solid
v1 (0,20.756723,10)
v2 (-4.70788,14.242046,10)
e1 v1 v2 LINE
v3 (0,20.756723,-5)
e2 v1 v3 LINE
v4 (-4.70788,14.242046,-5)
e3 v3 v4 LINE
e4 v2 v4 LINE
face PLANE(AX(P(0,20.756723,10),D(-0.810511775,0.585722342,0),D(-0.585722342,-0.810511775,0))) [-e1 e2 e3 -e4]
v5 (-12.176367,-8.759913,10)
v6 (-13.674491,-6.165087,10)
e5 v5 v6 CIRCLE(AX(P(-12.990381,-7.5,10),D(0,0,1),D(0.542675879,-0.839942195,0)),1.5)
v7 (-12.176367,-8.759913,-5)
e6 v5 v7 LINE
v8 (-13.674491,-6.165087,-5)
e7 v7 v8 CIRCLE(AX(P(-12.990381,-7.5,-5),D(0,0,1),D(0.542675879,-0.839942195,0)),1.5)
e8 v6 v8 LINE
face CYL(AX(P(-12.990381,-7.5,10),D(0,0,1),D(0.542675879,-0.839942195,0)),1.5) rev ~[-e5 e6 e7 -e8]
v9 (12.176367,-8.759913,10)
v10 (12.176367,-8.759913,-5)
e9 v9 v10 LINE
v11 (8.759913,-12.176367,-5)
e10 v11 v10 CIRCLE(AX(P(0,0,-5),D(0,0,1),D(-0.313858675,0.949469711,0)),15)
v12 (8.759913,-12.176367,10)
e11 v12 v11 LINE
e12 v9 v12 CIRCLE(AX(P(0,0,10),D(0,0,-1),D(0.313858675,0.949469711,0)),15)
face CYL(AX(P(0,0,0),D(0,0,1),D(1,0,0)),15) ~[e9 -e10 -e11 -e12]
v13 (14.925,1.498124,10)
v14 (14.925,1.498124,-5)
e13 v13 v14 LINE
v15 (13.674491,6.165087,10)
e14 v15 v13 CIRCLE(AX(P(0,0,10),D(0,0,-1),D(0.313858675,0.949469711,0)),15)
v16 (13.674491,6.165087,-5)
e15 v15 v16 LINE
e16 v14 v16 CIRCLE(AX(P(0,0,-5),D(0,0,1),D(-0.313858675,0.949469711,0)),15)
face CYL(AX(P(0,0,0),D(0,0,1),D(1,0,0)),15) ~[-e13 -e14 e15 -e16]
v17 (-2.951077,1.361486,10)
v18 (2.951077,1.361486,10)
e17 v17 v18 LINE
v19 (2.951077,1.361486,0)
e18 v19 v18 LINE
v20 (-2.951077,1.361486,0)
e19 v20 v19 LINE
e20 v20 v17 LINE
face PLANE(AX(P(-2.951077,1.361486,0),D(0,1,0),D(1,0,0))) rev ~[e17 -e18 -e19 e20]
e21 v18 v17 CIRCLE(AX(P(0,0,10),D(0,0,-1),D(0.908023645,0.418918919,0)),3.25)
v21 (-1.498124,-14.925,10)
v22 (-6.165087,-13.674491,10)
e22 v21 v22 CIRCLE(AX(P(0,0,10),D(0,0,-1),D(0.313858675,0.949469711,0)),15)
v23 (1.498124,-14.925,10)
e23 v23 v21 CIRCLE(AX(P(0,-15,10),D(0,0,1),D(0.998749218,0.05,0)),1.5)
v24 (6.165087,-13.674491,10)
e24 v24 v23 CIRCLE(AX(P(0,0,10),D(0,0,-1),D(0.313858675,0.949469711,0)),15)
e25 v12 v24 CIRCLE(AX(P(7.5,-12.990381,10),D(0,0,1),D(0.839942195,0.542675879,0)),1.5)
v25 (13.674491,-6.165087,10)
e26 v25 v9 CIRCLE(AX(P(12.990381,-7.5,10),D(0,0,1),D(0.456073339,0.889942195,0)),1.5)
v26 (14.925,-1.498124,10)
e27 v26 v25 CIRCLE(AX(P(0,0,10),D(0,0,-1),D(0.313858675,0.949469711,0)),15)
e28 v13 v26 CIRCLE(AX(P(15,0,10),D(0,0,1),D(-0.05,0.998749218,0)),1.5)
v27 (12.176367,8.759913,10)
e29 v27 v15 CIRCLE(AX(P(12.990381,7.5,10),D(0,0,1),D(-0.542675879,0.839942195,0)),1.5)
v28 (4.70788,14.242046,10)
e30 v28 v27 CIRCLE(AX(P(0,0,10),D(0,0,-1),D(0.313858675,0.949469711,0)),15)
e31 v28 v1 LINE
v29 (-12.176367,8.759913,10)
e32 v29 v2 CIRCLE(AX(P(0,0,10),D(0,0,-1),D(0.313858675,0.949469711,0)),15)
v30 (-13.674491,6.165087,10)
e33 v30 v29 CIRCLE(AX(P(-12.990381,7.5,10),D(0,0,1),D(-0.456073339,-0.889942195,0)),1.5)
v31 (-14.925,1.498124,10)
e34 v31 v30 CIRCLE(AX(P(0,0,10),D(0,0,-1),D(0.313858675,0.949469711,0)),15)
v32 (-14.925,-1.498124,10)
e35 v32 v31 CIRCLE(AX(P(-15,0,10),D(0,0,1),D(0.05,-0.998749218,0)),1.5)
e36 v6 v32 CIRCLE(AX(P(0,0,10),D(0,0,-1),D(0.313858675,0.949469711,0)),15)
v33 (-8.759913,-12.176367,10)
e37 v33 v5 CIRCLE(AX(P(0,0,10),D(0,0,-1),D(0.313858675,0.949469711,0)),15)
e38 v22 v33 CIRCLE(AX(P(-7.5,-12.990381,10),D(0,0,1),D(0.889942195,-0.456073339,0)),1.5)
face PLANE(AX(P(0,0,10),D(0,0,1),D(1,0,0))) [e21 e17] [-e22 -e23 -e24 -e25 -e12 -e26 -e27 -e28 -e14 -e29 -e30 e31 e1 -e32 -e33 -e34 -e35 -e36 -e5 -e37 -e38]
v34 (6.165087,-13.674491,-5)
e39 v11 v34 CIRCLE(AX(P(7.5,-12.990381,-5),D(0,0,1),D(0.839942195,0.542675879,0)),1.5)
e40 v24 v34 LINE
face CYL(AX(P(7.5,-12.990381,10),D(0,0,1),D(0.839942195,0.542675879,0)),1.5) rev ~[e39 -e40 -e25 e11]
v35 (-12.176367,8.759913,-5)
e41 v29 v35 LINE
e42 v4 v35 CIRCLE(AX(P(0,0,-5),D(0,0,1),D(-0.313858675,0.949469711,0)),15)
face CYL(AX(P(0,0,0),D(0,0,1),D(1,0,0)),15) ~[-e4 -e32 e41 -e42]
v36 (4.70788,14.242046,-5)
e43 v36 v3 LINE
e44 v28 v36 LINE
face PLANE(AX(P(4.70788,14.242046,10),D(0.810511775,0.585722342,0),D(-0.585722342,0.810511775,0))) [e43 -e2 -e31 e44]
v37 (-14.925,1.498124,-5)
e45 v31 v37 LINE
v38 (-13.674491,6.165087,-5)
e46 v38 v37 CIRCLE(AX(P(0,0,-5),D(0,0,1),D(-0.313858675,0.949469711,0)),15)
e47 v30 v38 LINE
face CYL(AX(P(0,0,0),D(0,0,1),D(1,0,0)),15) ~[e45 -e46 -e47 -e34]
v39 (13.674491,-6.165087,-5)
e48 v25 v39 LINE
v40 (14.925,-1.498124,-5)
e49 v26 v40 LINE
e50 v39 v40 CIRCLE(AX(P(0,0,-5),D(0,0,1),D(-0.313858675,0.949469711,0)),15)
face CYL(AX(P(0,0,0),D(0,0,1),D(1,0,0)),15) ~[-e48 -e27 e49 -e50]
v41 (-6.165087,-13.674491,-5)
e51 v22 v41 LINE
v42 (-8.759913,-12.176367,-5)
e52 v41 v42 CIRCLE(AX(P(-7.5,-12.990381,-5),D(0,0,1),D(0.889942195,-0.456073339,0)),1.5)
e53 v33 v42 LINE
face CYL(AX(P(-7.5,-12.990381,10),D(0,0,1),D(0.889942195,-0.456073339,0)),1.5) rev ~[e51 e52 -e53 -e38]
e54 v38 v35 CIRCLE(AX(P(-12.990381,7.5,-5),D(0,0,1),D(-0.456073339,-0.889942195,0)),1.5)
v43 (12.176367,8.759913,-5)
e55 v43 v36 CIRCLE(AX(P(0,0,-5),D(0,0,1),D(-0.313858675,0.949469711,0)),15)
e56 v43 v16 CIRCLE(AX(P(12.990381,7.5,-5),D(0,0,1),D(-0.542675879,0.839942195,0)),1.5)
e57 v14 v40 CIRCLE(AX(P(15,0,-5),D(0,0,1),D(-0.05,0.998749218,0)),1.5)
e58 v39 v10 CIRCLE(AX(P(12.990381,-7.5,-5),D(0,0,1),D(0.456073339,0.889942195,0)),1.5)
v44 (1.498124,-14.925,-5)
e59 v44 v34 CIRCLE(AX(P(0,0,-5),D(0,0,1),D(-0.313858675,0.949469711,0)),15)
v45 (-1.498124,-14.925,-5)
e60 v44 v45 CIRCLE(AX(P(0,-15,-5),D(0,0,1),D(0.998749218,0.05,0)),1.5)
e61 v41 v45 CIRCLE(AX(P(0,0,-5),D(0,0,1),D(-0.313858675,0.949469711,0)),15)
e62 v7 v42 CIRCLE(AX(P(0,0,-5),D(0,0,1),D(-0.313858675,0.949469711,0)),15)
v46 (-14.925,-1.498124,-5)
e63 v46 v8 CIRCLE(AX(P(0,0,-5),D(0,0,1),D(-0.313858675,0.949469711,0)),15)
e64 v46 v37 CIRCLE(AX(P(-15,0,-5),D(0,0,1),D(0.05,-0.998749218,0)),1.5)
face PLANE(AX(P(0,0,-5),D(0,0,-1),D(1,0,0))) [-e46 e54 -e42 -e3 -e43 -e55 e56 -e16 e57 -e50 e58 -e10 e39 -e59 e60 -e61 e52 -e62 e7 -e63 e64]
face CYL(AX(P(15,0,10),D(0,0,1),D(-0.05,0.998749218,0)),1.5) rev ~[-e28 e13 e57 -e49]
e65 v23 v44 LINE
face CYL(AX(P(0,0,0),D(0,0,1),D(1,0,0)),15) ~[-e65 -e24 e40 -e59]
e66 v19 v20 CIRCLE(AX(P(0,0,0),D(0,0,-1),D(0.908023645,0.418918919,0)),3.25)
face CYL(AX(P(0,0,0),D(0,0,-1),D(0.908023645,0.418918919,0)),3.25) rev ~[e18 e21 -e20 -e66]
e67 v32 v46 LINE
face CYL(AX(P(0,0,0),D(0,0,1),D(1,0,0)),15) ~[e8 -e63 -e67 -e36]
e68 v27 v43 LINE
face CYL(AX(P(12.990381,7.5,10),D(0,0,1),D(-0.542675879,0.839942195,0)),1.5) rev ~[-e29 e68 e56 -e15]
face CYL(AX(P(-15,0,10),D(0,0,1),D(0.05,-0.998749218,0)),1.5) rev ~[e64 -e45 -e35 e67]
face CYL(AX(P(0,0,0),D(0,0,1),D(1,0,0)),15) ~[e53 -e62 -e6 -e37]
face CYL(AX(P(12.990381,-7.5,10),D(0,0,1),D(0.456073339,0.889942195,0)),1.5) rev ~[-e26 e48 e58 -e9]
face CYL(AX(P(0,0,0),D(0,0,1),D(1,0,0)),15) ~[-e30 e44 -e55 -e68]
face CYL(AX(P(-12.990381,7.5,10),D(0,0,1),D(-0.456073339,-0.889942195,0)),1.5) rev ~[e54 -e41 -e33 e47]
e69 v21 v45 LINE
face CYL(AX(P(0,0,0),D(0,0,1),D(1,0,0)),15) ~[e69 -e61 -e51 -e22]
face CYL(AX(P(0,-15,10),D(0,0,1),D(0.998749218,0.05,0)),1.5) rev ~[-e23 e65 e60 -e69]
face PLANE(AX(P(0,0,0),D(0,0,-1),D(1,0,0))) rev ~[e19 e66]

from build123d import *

# Parameters (mm, degrees)
F0_R     = 15
F1_DEPTH = 10
F2_R     = 15
F3_DEPTH = 5
F5_DEPTH = 15
F6_DEPTH = 15


# Not quite as in the source:
# - a feature names something its author has since deleted; it is built from what else it names


with BuildPart() as f1:
    # F0 (on Top) → F1 (new body)
    with BuildSketch(Plane.XY):
        Circle(F0_R)
        with BuildLine():
            ThreePointArc((2.9510768453, 1.3614864865), (0, -3.25), (-2.9510768453, 1.3614864865))
            Line((-2.9510768453, 1.3614864865), (2.9510768453, 1.3614864865))
        make_face(mode=Mode.SUBTRACT)
    extrude(amount=F1_DEPTH)

    # F2 (on face) → F3 (join)
    with BuildSketch(Plane(origin=(0, 0, 0), x_dir=(1, 0, 0), z_dir=(0, 0, -1))):
        Circle(F2_R)
        with BuildLine():
            ThreePointArc((-2.9510768453, -1.3614864865), (0, 3.25), (2.9510768453, -1.3614864865))
            Line((2.9510768453, -1.3614864865), (-2.9510768453, -1.3614864865))
        make_face(mode=Mode.SUBTRACT)
        with BuildLine():
            Line((-2.9510768453, -1.3614864865), (2.9510768453, -1.3614864865))
            ThreePointArc((2.9510768453, -1.3614864865), (0, 3.25), (-2.9510768453, -1.3614864865))
        make_face()
    extrude(amount=F3_DEPTH)

    # F4 (on face) → F5 (join)
    with BuildSketch(Plane.XY.offset(10)):
        with BuildLine():
            Line((4.707880128, 14.2420456642), (0, 20.7567233592))
            Line((0, 20.7567233592), (-4.707880128, 14.2420456642))
            ThreePointArc((-4.707880128, 14.2420456642), (0, 15), (4.707880128, 14.2420456642))
        make_face()
    extrude(amount=-F5_DEPTH)

    # F4 (on face) → F6 (cut, through all)
    with BuildSketch(Plane.XY.offset(10)):
        with BuildLine():
            ThreePointArc((13.6744910648, 6.1650867081), (12.9903810568, 7.5), (12.1763672382, 8.7599132919))
            ThreePointArc((12.1763672382, 8.7599132919), (11.6913429511, 6.75), (13.6744910648, 6.1650867081))
        make_face()
        with BuildLine():
            ThreePointArc((15, 0), (14.9812382666, 0.75), (14.925, 1.4981238267))
            ThreePointArc((14.925, 1.4981238267), (13.5, 0), (14.925, -1.4981238267))
            ThreePointArc((14.925, -1.4981238267), (14.9812382666, -0.75), (15, 0))
        make_face()
        with BuildLine():
            ThreePointArc((12.1763672382, -8.7599132919), (12.9903810568, -7.5), (13.6744910648, -6.1650867081))
            ThreePointArc((13.6744910648, -6.1650867081), (11.6913429511, -6.75), (12.1763672382, -8.7599132919))
        make_face()
        with BuildLine():
            ThreePointArc((6.1650867081, -13.6744910648), (7.5, -12.9903810568), (8.7599132919, -12.1763672382))
            ThreePointArc((8.7599132919, -12.1763672382), (6.75, -11.6913429511), (6.1650867081, -13.6744910648))
        make_face()
        with BuildLine():
            ThreePointArc((1.4981238267, -14.925), (0, -13.5), (-1.4981238267, -14.925))
            ThreePointArc((-1.4981238267, -14.925), (0, -15), (1.4981238267, -14.925))
        make_face()
        with BuildLine():
            ThreePointArc((-6.1650867081, -13.6744910648), (-6.75, -11.6913429511), (-8.7599132919, -12.1763672382))
            ThreePointArc((-8.7599132919, -12.1763672382), (-7.5, -12.9903810568), (-6.1650867081, -13.6744910648))
        make_face()
        with BuildLine():
            ThreePointArc((-12.1763672382, -8.7599132919), (-11.6913429511, -6.75), (-13.6744910648, -6.1650867081))
            ThreePointArc((-13.6744910648, -6.1650867081), (-12.9903810568, -7.5), (-12.1763672382, -8.7599132919))
        make_face()
        with BuildLine():
            ThreePointArc((-14.925, -1.4981238267), (-13.5, 0), (-14.925, 1.4981238267))
            ThreePointArc((-14.925, 1.4981238267), (-15, 0), (-14.925, -1.4981238267))
        make_face()
        with BuildLine():
            ThreePointArc((-13.6744910648, 6.1650867081), (-11.6913429511, 6.75), (-12.1763672382, 8.7599132919))
            ThreePointArc((-12.1763672382, 8.7599132919), (-12.9903810568, 7.5), (-13.6744910648, 6.1650867081))
        make_face()
    extrude(amount=-F6_DEPTH, mode=Mode.SUBTRACT)


solid = f1.part
